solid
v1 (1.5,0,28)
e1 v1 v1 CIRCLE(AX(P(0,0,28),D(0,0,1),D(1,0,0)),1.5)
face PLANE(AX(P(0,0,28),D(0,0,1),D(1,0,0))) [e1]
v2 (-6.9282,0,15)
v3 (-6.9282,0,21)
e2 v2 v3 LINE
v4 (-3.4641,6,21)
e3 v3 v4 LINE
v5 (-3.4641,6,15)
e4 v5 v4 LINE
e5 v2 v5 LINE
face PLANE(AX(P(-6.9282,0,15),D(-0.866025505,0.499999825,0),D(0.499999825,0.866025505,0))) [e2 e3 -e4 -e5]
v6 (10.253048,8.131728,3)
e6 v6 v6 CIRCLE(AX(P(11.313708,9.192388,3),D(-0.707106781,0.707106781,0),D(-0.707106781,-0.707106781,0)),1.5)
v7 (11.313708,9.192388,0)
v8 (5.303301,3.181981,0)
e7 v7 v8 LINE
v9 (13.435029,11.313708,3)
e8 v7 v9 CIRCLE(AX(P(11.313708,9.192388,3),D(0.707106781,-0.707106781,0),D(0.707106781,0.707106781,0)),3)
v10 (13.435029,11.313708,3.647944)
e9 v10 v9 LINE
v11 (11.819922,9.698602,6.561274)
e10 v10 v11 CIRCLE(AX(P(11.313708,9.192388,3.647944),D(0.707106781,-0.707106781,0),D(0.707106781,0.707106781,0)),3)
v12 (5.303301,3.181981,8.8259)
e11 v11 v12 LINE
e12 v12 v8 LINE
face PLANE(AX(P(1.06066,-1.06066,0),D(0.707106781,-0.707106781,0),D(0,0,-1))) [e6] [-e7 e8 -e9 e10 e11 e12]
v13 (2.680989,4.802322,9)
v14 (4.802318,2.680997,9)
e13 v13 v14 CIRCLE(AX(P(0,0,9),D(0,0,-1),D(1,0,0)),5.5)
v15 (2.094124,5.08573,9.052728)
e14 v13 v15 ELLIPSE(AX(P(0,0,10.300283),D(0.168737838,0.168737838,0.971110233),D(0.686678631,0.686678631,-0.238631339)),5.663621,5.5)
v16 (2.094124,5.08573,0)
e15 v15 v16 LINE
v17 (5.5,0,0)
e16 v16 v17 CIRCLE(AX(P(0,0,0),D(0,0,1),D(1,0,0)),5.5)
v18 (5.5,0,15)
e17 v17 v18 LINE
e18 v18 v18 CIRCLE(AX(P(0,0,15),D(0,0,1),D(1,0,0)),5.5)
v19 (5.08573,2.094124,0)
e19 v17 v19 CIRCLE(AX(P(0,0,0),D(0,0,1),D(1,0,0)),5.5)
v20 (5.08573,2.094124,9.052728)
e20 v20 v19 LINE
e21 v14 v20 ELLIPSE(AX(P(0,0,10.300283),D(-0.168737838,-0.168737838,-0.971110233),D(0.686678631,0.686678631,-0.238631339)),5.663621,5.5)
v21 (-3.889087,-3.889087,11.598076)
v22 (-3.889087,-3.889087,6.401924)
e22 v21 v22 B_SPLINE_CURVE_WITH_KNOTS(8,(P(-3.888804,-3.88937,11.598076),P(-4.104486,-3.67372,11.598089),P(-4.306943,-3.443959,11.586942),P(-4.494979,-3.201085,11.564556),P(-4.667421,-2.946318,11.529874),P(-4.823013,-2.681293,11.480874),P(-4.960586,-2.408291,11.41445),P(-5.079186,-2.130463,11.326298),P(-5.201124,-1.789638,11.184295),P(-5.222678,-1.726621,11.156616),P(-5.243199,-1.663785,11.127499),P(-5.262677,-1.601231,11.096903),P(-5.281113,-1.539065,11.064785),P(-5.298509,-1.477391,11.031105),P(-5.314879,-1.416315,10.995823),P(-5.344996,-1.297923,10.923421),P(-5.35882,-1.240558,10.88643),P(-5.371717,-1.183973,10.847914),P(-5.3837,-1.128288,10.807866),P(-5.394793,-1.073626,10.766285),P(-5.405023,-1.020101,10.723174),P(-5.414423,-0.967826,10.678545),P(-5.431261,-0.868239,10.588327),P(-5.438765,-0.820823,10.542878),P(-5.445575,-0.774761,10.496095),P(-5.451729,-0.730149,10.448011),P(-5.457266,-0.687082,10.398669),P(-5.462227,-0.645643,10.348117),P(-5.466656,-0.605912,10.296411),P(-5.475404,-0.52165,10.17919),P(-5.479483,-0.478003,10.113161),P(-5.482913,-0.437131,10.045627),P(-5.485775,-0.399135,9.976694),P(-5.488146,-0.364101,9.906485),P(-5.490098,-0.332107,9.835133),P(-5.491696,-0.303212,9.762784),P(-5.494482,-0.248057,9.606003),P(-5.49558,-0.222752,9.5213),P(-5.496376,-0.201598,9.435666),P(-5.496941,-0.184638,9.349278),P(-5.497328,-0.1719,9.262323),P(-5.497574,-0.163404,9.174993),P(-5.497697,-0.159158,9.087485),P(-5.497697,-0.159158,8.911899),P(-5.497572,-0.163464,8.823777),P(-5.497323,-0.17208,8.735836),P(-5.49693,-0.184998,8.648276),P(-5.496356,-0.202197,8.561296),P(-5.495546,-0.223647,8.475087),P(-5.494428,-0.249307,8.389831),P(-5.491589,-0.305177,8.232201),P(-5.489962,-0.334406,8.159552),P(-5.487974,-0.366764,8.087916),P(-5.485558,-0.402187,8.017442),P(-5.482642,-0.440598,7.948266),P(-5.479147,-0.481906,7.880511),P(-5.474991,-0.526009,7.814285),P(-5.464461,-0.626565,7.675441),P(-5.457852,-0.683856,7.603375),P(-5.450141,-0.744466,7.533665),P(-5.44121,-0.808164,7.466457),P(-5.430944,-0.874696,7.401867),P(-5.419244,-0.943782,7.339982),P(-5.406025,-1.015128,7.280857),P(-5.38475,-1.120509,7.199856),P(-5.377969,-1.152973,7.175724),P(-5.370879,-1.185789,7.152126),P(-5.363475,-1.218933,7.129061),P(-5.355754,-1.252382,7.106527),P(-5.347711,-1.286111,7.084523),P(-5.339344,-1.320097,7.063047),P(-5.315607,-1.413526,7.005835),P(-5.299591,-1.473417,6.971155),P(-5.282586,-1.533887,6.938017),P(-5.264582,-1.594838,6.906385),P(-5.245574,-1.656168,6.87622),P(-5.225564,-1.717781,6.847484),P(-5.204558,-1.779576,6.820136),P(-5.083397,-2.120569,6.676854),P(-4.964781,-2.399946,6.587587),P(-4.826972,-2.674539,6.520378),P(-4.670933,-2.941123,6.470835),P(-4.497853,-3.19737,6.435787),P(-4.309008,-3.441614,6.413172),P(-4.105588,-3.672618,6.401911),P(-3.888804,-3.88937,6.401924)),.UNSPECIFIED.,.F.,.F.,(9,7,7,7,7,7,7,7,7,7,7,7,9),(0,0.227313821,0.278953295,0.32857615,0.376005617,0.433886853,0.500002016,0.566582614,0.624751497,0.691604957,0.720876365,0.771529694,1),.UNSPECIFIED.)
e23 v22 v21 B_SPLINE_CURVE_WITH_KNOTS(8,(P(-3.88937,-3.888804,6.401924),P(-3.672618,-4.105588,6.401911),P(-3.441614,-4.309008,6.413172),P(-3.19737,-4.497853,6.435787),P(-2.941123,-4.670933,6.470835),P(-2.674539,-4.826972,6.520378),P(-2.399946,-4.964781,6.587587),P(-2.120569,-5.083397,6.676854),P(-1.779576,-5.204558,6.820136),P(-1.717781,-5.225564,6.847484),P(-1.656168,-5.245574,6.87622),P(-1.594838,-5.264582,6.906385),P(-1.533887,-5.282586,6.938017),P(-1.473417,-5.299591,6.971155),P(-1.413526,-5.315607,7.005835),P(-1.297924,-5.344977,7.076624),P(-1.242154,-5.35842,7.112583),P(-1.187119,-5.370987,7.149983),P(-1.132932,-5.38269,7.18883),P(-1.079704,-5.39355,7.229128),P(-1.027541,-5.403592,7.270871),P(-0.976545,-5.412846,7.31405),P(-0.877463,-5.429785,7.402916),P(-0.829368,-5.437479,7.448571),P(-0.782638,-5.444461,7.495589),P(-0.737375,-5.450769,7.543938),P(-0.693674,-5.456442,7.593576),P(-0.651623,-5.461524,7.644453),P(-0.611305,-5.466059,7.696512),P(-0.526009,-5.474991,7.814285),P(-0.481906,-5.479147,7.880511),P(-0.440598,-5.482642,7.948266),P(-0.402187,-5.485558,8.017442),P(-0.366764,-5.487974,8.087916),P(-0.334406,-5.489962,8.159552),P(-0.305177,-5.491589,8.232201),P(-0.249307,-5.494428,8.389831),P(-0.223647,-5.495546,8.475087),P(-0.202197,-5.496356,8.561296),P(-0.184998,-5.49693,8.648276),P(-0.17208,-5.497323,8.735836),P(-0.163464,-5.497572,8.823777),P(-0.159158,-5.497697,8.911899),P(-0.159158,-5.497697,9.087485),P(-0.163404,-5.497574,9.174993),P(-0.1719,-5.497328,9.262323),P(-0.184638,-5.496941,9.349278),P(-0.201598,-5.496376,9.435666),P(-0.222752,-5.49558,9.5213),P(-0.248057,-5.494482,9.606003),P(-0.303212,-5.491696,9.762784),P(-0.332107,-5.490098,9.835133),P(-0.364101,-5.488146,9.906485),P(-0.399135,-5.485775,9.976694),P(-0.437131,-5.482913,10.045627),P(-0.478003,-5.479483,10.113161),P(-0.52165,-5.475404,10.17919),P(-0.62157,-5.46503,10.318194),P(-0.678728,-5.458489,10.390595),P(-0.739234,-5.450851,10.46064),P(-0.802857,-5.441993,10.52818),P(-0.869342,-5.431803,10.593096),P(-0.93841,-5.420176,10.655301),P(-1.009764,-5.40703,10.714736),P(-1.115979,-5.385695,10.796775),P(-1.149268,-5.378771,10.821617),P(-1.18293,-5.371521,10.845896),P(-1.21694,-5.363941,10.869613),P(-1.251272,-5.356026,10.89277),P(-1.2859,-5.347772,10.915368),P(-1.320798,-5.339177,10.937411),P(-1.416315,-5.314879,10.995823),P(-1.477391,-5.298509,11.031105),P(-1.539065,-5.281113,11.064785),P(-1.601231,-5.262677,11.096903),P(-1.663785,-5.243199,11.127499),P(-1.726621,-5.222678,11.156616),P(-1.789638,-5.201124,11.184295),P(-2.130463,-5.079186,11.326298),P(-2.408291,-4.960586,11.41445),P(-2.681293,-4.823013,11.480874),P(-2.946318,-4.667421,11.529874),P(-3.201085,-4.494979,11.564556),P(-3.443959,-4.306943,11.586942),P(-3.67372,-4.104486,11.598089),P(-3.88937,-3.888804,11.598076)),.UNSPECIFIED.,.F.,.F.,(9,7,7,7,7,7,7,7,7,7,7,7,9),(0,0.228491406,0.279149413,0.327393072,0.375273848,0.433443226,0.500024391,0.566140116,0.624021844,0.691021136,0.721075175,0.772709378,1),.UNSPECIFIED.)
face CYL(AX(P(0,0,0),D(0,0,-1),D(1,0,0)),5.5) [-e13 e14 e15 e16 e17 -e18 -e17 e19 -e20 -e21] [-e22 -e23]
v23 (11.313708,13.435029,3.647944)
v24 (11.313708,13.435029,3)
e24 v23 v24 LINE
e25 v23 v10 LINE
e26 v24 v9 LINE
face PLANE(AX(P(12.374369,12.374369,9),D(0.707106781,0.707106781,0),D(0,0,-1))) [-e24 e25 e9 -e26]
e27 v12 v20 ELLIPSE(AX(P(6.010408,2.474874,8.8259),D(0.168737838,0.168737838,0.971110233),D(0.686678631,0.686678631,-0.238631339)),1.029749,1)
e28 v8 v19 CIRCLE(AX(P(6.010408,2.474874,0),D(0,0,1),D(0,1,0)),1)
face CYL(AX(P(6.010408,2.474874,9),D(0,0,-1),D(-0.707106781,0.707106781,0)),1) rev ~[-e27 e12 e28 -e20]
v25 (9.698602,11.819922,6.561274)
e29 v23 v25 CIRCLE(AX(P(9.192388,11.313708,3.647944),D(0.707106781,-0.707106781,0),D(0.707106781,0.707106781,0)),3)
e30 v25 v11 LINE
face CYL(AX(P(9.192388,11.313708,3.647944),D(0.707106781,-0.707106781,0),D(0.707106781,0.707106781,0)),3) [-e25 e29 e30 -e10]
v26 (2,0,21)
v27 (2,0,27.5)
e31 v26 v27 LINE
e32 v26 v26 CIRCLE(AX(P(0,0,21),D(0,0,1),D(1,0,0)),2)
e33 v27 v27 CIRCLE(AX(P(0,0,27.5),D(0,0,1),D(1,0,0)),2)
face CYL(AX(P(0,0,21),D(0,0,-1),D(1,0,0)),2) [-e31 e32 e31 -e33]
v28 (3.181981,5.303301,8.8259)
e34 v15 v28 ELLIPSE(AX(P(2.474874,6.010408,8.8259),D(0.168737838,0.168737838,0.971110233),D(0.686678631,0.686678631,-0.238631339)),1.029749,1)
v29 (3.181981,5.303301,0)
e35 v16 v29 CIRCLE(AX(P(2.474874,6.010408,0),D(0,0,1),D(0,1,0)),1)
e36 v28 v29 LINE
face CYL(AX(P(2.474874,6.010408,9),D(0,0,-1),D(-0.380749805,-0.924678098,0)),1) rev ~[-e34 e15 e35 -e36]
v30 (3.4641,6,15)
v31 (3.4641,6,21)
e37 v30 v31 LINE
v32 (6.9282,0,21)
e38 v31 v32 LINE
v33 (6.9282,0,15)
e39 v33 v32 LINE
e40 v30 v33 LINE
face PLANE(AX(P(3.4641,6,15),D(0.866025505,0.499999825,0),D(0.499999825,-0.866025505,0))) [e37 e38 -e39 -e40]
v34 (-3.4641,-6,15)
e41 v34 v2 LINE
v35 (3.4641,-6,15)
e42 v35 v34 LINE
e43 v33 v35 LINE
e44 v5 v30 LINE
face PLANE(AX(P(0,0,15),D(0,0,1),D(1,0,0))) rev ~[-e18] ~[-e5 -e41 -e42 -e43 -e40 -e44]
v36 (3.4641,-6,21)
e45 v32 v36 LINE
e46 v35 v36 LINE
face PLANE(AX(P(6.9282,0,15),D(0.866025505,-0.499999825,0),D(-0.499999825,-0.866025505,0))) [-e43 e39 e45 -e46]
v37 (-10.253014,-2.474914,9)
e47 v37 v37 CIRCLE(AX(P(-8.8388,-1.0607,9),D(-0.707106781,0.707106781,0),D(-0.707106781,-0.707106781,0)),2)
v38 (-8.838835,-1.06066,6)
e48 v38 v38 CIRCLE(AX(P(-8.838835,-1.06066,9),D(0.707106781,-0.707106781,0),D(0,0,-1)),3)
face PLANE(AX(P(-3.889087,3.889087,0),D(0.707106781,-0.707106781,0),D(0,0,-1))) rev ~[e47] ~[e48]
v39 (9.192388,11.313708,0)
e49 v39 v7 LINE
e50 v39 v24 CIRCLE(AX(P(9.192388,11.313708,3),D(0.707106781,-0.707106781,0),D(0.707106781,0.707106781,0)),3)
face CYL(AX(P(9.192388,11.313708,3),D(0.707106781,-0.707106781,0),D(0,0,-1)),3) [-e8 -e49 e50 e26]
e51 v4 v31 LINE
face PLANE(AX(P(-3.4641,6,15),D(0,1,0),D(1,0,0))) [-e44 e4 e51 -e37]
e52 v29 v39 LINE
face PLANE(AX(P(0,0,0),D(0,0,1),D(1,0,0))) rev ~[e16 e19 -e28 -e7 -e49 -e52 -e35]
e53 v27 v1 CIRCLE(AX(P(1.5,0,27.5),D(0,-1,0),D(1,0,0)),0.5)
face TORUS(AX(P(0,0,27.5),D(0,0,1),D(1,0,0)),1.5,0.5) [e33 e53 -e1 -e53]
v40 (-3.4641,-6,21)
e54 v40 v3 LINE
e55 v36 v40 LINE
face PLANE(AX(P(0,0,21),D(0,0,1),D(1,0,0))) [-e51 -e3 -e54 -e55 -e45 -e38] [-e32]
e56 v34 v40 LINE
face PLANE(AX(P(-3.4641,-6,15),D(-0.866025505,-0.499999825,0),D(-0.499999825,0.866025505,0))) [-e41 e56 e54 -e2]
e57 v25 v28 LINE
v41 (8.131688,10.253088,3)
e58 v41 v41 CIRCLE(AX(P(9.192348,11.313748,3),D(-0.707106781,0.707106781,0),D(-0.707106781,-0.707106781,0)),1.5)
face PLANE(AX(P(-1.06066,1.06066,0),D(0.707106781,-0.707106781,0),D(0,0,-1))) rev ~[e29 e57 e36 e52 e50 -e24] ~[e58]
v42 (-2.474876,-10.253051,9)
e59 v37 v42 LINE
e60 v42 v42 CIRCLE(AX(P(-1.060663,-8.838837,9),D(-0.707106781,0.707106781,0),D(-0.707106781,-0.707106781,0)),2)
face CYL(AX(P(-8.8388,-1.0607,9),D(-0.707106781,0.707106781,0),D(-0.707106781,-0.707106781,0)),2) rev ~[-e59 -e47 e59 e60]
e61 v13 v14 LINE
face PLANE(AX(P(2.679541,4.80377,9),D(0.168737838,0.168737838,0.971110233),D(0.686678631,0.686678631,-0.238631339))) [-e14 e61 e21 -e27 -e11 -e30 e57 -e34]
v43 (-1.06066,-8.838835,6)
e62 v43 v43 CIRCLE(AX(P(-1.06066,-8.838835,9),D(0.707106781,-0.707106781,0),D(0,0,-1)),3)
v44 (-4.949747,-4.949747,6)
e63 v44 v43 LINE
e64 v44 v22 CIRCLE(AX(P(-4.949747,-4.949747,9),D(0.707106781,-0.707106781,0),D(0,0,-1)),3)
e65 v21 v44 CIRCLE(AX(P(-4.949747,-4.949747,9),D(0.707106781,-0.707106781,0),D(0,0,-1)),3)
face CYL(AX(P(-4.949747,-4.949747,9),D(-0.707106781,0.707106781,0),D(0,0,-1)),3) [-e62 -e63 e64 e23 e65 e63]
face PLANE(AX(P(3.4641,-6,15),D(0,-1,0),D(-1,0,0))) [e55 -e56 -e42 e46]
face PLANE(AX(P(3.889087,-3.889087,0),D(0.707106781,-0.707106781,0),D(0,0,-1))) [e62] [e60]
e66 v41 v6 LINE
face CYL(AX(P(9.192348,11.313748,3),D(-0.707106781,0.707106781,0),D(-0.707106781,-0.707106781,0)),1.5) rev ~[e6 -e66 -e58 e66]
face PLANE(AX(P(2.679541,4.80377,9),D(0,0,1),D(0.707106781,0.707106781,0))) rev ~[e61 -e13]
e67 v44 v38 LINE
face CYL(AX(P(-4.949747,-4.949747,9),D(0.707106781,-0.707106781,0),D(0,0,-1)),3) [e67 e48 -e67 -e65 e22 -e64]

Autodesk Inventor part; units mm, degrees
ref_plane "XY Plane" through (0, 0, 0) normal (0, 0, 1) x (1, 0, 0)
sketch "Esquisse1" plane through (0, 0, 0) normal (0, 0, 1) x (1, 0, 0)
  circle A0 centre (0, 0) radius 5.5
  dimension "d0" = 11
extrude "Extrusion1" add sketch "Esquisse1" along normal blind 15
ref_plane "Plan de construction1" through (0, 0, 0) normal (0.7071068, -0.7071068, 0) x (0, 0, -1)
sketch "Esquisse3" plane through (0, 0, 0) normal (0.7071068, -0.7071068, 0) x (0, 0, -1)
  circle A0 centre (-9, -7) radius 3
  line L0 (-15, 5.5) -> (-15, -5.5) projected
  line L1 (0, -5.5) -> (0, 5.5) projected
  point P0 (0, 0)
  dimension "d3" = 6
  dimension "d4" = 7
  dimension "d5" = 15
  dimension "d6" = 9
extrude "Extrusion2" add sketch "Esquisse3" along normal mid plane 11
sketch "Esquisse4" plane through (-8.8388, -1.0607, 9) normal (-0.7071068, 0.7071068, 0) x (-0.7071068, -0.7071068, 0)
  circle A0 centre (0, 0) radius 2
  point P0 (-7, -9)
  dimension "d9" = 4
extrude "Extrusion3" cut sketch "Esquisse4" against normal through all
sketch "Esquisse5" plane through (0, 0, 15) normal (0, 0, 1) x (1, 0, 0)
  line L0 (-6.9282, 0) -> (-3.4641, 6)
  line L1 (-3.4641, 6) -> (3.4641, 6)
  line L2 (3.4641, 6) -> (6.9282, 0)
  line L3 (6.9282, 0) -> (3.4641, -6)
  line L4 (3.4641, -6) -> (-3.4641, -6)
  line L5 (-3.4641, -6) -> (-6.9282, 0)
  point P0 (0, 0)
  point P1 (0, 0)
  dimension "d12" = 12
extrude "Extrusion4" add sketch "Esquisse5" along normal blind 6
sketch "Esquisse6" plane through (0, 0, 21) normal (0, 0, 1) x (1, 0, 0)
  circle A0 centre (0, 0) radius 2
  dimension "d15" = 4
extrude "Extrusion5" add sketch "Esquisse6" along normal blind 7
thread "Filetage1" size "M4x0.7" class "6g" standard "ANSI Metric M Profile" full length
fillet "Congé1" radius 0.5 1 edges at (-2, 0, 28)
sketch "Esquisse8" plane through (0, 0, 0) normal (0.7071068, -0.7071068, 0) x (0, 0, -1)
  line L0 (0, -5.5) -> (0, 5.5) projected
  line L1 (0, 3.5) -> (-9, 3.5)
  line L2 (-9, 3.5) -> (-9, 17.5)
  line L3 (-9, 17.5) -> (0, 17.5)
  line L4 (0, 17.5) -> (0, 3.5)
  point P0 (0, 0)
  dimension "d21" = 3.5
  dimension "d22" = 14
  dimension "d23" = 9
extrude "Extrusion6" add sketch "Esquisse8" along normal mid plane 3
sketch "Esquisse9" plane through (-1.0607, 1.0607, 0) normal (-0.7071068, 0.7071068, 0) x (-0.7071068, -0.7071068, 0)
  line L0 (-5.2915, 9) -> (-5.2915, 0) projected
  line L1 (-5.2915, 9) -> (-17.5, 6)
  line L2 (-17.5, 9) -> (-17.5, 0) projected
  line L3 (-5.2915, 9) -> (-17.5, 9) projected
  line L4 (-17.5, 9) -> (-5.2915, 9)
  point P0 (0, 0)
  dimension "d26" = 6
extrude "Extrusion7" cut sketch "Esquisse9" against normal blind 3
sketch "Esquisse10" plane through (-1.0607, 1.0607, 0) normal (-0.7071068, 0.7071068, 0) x (-0.7071068, -0.7071068, 0)
  circle A0 centre (-14.5, 3) radius 1.5
  line L0 (-17.5, 0) -> (-5.2915, 0) projected
  line L1 (-17.5, 6) -> (-17.5, 0) projected
  point P0 (0, 0)
  dimension "d29" = 3
  dimension "d30" = 3
  dimension "d31" = 3
extrude "Extrusion8" cut sketch "Esquisse10" against normal through all
fillet "Congé2" radius 3 2 edges at (12.3744, 12.3744, 0) (12.3744, 12.3744, 6)
fillet "Congé3" radius 1 2 edges at (2.681, 4.8023, 4.5) (4.8023, 2.681, 4.5)
properties part number "Fusée" material "Acier inoxydable"
